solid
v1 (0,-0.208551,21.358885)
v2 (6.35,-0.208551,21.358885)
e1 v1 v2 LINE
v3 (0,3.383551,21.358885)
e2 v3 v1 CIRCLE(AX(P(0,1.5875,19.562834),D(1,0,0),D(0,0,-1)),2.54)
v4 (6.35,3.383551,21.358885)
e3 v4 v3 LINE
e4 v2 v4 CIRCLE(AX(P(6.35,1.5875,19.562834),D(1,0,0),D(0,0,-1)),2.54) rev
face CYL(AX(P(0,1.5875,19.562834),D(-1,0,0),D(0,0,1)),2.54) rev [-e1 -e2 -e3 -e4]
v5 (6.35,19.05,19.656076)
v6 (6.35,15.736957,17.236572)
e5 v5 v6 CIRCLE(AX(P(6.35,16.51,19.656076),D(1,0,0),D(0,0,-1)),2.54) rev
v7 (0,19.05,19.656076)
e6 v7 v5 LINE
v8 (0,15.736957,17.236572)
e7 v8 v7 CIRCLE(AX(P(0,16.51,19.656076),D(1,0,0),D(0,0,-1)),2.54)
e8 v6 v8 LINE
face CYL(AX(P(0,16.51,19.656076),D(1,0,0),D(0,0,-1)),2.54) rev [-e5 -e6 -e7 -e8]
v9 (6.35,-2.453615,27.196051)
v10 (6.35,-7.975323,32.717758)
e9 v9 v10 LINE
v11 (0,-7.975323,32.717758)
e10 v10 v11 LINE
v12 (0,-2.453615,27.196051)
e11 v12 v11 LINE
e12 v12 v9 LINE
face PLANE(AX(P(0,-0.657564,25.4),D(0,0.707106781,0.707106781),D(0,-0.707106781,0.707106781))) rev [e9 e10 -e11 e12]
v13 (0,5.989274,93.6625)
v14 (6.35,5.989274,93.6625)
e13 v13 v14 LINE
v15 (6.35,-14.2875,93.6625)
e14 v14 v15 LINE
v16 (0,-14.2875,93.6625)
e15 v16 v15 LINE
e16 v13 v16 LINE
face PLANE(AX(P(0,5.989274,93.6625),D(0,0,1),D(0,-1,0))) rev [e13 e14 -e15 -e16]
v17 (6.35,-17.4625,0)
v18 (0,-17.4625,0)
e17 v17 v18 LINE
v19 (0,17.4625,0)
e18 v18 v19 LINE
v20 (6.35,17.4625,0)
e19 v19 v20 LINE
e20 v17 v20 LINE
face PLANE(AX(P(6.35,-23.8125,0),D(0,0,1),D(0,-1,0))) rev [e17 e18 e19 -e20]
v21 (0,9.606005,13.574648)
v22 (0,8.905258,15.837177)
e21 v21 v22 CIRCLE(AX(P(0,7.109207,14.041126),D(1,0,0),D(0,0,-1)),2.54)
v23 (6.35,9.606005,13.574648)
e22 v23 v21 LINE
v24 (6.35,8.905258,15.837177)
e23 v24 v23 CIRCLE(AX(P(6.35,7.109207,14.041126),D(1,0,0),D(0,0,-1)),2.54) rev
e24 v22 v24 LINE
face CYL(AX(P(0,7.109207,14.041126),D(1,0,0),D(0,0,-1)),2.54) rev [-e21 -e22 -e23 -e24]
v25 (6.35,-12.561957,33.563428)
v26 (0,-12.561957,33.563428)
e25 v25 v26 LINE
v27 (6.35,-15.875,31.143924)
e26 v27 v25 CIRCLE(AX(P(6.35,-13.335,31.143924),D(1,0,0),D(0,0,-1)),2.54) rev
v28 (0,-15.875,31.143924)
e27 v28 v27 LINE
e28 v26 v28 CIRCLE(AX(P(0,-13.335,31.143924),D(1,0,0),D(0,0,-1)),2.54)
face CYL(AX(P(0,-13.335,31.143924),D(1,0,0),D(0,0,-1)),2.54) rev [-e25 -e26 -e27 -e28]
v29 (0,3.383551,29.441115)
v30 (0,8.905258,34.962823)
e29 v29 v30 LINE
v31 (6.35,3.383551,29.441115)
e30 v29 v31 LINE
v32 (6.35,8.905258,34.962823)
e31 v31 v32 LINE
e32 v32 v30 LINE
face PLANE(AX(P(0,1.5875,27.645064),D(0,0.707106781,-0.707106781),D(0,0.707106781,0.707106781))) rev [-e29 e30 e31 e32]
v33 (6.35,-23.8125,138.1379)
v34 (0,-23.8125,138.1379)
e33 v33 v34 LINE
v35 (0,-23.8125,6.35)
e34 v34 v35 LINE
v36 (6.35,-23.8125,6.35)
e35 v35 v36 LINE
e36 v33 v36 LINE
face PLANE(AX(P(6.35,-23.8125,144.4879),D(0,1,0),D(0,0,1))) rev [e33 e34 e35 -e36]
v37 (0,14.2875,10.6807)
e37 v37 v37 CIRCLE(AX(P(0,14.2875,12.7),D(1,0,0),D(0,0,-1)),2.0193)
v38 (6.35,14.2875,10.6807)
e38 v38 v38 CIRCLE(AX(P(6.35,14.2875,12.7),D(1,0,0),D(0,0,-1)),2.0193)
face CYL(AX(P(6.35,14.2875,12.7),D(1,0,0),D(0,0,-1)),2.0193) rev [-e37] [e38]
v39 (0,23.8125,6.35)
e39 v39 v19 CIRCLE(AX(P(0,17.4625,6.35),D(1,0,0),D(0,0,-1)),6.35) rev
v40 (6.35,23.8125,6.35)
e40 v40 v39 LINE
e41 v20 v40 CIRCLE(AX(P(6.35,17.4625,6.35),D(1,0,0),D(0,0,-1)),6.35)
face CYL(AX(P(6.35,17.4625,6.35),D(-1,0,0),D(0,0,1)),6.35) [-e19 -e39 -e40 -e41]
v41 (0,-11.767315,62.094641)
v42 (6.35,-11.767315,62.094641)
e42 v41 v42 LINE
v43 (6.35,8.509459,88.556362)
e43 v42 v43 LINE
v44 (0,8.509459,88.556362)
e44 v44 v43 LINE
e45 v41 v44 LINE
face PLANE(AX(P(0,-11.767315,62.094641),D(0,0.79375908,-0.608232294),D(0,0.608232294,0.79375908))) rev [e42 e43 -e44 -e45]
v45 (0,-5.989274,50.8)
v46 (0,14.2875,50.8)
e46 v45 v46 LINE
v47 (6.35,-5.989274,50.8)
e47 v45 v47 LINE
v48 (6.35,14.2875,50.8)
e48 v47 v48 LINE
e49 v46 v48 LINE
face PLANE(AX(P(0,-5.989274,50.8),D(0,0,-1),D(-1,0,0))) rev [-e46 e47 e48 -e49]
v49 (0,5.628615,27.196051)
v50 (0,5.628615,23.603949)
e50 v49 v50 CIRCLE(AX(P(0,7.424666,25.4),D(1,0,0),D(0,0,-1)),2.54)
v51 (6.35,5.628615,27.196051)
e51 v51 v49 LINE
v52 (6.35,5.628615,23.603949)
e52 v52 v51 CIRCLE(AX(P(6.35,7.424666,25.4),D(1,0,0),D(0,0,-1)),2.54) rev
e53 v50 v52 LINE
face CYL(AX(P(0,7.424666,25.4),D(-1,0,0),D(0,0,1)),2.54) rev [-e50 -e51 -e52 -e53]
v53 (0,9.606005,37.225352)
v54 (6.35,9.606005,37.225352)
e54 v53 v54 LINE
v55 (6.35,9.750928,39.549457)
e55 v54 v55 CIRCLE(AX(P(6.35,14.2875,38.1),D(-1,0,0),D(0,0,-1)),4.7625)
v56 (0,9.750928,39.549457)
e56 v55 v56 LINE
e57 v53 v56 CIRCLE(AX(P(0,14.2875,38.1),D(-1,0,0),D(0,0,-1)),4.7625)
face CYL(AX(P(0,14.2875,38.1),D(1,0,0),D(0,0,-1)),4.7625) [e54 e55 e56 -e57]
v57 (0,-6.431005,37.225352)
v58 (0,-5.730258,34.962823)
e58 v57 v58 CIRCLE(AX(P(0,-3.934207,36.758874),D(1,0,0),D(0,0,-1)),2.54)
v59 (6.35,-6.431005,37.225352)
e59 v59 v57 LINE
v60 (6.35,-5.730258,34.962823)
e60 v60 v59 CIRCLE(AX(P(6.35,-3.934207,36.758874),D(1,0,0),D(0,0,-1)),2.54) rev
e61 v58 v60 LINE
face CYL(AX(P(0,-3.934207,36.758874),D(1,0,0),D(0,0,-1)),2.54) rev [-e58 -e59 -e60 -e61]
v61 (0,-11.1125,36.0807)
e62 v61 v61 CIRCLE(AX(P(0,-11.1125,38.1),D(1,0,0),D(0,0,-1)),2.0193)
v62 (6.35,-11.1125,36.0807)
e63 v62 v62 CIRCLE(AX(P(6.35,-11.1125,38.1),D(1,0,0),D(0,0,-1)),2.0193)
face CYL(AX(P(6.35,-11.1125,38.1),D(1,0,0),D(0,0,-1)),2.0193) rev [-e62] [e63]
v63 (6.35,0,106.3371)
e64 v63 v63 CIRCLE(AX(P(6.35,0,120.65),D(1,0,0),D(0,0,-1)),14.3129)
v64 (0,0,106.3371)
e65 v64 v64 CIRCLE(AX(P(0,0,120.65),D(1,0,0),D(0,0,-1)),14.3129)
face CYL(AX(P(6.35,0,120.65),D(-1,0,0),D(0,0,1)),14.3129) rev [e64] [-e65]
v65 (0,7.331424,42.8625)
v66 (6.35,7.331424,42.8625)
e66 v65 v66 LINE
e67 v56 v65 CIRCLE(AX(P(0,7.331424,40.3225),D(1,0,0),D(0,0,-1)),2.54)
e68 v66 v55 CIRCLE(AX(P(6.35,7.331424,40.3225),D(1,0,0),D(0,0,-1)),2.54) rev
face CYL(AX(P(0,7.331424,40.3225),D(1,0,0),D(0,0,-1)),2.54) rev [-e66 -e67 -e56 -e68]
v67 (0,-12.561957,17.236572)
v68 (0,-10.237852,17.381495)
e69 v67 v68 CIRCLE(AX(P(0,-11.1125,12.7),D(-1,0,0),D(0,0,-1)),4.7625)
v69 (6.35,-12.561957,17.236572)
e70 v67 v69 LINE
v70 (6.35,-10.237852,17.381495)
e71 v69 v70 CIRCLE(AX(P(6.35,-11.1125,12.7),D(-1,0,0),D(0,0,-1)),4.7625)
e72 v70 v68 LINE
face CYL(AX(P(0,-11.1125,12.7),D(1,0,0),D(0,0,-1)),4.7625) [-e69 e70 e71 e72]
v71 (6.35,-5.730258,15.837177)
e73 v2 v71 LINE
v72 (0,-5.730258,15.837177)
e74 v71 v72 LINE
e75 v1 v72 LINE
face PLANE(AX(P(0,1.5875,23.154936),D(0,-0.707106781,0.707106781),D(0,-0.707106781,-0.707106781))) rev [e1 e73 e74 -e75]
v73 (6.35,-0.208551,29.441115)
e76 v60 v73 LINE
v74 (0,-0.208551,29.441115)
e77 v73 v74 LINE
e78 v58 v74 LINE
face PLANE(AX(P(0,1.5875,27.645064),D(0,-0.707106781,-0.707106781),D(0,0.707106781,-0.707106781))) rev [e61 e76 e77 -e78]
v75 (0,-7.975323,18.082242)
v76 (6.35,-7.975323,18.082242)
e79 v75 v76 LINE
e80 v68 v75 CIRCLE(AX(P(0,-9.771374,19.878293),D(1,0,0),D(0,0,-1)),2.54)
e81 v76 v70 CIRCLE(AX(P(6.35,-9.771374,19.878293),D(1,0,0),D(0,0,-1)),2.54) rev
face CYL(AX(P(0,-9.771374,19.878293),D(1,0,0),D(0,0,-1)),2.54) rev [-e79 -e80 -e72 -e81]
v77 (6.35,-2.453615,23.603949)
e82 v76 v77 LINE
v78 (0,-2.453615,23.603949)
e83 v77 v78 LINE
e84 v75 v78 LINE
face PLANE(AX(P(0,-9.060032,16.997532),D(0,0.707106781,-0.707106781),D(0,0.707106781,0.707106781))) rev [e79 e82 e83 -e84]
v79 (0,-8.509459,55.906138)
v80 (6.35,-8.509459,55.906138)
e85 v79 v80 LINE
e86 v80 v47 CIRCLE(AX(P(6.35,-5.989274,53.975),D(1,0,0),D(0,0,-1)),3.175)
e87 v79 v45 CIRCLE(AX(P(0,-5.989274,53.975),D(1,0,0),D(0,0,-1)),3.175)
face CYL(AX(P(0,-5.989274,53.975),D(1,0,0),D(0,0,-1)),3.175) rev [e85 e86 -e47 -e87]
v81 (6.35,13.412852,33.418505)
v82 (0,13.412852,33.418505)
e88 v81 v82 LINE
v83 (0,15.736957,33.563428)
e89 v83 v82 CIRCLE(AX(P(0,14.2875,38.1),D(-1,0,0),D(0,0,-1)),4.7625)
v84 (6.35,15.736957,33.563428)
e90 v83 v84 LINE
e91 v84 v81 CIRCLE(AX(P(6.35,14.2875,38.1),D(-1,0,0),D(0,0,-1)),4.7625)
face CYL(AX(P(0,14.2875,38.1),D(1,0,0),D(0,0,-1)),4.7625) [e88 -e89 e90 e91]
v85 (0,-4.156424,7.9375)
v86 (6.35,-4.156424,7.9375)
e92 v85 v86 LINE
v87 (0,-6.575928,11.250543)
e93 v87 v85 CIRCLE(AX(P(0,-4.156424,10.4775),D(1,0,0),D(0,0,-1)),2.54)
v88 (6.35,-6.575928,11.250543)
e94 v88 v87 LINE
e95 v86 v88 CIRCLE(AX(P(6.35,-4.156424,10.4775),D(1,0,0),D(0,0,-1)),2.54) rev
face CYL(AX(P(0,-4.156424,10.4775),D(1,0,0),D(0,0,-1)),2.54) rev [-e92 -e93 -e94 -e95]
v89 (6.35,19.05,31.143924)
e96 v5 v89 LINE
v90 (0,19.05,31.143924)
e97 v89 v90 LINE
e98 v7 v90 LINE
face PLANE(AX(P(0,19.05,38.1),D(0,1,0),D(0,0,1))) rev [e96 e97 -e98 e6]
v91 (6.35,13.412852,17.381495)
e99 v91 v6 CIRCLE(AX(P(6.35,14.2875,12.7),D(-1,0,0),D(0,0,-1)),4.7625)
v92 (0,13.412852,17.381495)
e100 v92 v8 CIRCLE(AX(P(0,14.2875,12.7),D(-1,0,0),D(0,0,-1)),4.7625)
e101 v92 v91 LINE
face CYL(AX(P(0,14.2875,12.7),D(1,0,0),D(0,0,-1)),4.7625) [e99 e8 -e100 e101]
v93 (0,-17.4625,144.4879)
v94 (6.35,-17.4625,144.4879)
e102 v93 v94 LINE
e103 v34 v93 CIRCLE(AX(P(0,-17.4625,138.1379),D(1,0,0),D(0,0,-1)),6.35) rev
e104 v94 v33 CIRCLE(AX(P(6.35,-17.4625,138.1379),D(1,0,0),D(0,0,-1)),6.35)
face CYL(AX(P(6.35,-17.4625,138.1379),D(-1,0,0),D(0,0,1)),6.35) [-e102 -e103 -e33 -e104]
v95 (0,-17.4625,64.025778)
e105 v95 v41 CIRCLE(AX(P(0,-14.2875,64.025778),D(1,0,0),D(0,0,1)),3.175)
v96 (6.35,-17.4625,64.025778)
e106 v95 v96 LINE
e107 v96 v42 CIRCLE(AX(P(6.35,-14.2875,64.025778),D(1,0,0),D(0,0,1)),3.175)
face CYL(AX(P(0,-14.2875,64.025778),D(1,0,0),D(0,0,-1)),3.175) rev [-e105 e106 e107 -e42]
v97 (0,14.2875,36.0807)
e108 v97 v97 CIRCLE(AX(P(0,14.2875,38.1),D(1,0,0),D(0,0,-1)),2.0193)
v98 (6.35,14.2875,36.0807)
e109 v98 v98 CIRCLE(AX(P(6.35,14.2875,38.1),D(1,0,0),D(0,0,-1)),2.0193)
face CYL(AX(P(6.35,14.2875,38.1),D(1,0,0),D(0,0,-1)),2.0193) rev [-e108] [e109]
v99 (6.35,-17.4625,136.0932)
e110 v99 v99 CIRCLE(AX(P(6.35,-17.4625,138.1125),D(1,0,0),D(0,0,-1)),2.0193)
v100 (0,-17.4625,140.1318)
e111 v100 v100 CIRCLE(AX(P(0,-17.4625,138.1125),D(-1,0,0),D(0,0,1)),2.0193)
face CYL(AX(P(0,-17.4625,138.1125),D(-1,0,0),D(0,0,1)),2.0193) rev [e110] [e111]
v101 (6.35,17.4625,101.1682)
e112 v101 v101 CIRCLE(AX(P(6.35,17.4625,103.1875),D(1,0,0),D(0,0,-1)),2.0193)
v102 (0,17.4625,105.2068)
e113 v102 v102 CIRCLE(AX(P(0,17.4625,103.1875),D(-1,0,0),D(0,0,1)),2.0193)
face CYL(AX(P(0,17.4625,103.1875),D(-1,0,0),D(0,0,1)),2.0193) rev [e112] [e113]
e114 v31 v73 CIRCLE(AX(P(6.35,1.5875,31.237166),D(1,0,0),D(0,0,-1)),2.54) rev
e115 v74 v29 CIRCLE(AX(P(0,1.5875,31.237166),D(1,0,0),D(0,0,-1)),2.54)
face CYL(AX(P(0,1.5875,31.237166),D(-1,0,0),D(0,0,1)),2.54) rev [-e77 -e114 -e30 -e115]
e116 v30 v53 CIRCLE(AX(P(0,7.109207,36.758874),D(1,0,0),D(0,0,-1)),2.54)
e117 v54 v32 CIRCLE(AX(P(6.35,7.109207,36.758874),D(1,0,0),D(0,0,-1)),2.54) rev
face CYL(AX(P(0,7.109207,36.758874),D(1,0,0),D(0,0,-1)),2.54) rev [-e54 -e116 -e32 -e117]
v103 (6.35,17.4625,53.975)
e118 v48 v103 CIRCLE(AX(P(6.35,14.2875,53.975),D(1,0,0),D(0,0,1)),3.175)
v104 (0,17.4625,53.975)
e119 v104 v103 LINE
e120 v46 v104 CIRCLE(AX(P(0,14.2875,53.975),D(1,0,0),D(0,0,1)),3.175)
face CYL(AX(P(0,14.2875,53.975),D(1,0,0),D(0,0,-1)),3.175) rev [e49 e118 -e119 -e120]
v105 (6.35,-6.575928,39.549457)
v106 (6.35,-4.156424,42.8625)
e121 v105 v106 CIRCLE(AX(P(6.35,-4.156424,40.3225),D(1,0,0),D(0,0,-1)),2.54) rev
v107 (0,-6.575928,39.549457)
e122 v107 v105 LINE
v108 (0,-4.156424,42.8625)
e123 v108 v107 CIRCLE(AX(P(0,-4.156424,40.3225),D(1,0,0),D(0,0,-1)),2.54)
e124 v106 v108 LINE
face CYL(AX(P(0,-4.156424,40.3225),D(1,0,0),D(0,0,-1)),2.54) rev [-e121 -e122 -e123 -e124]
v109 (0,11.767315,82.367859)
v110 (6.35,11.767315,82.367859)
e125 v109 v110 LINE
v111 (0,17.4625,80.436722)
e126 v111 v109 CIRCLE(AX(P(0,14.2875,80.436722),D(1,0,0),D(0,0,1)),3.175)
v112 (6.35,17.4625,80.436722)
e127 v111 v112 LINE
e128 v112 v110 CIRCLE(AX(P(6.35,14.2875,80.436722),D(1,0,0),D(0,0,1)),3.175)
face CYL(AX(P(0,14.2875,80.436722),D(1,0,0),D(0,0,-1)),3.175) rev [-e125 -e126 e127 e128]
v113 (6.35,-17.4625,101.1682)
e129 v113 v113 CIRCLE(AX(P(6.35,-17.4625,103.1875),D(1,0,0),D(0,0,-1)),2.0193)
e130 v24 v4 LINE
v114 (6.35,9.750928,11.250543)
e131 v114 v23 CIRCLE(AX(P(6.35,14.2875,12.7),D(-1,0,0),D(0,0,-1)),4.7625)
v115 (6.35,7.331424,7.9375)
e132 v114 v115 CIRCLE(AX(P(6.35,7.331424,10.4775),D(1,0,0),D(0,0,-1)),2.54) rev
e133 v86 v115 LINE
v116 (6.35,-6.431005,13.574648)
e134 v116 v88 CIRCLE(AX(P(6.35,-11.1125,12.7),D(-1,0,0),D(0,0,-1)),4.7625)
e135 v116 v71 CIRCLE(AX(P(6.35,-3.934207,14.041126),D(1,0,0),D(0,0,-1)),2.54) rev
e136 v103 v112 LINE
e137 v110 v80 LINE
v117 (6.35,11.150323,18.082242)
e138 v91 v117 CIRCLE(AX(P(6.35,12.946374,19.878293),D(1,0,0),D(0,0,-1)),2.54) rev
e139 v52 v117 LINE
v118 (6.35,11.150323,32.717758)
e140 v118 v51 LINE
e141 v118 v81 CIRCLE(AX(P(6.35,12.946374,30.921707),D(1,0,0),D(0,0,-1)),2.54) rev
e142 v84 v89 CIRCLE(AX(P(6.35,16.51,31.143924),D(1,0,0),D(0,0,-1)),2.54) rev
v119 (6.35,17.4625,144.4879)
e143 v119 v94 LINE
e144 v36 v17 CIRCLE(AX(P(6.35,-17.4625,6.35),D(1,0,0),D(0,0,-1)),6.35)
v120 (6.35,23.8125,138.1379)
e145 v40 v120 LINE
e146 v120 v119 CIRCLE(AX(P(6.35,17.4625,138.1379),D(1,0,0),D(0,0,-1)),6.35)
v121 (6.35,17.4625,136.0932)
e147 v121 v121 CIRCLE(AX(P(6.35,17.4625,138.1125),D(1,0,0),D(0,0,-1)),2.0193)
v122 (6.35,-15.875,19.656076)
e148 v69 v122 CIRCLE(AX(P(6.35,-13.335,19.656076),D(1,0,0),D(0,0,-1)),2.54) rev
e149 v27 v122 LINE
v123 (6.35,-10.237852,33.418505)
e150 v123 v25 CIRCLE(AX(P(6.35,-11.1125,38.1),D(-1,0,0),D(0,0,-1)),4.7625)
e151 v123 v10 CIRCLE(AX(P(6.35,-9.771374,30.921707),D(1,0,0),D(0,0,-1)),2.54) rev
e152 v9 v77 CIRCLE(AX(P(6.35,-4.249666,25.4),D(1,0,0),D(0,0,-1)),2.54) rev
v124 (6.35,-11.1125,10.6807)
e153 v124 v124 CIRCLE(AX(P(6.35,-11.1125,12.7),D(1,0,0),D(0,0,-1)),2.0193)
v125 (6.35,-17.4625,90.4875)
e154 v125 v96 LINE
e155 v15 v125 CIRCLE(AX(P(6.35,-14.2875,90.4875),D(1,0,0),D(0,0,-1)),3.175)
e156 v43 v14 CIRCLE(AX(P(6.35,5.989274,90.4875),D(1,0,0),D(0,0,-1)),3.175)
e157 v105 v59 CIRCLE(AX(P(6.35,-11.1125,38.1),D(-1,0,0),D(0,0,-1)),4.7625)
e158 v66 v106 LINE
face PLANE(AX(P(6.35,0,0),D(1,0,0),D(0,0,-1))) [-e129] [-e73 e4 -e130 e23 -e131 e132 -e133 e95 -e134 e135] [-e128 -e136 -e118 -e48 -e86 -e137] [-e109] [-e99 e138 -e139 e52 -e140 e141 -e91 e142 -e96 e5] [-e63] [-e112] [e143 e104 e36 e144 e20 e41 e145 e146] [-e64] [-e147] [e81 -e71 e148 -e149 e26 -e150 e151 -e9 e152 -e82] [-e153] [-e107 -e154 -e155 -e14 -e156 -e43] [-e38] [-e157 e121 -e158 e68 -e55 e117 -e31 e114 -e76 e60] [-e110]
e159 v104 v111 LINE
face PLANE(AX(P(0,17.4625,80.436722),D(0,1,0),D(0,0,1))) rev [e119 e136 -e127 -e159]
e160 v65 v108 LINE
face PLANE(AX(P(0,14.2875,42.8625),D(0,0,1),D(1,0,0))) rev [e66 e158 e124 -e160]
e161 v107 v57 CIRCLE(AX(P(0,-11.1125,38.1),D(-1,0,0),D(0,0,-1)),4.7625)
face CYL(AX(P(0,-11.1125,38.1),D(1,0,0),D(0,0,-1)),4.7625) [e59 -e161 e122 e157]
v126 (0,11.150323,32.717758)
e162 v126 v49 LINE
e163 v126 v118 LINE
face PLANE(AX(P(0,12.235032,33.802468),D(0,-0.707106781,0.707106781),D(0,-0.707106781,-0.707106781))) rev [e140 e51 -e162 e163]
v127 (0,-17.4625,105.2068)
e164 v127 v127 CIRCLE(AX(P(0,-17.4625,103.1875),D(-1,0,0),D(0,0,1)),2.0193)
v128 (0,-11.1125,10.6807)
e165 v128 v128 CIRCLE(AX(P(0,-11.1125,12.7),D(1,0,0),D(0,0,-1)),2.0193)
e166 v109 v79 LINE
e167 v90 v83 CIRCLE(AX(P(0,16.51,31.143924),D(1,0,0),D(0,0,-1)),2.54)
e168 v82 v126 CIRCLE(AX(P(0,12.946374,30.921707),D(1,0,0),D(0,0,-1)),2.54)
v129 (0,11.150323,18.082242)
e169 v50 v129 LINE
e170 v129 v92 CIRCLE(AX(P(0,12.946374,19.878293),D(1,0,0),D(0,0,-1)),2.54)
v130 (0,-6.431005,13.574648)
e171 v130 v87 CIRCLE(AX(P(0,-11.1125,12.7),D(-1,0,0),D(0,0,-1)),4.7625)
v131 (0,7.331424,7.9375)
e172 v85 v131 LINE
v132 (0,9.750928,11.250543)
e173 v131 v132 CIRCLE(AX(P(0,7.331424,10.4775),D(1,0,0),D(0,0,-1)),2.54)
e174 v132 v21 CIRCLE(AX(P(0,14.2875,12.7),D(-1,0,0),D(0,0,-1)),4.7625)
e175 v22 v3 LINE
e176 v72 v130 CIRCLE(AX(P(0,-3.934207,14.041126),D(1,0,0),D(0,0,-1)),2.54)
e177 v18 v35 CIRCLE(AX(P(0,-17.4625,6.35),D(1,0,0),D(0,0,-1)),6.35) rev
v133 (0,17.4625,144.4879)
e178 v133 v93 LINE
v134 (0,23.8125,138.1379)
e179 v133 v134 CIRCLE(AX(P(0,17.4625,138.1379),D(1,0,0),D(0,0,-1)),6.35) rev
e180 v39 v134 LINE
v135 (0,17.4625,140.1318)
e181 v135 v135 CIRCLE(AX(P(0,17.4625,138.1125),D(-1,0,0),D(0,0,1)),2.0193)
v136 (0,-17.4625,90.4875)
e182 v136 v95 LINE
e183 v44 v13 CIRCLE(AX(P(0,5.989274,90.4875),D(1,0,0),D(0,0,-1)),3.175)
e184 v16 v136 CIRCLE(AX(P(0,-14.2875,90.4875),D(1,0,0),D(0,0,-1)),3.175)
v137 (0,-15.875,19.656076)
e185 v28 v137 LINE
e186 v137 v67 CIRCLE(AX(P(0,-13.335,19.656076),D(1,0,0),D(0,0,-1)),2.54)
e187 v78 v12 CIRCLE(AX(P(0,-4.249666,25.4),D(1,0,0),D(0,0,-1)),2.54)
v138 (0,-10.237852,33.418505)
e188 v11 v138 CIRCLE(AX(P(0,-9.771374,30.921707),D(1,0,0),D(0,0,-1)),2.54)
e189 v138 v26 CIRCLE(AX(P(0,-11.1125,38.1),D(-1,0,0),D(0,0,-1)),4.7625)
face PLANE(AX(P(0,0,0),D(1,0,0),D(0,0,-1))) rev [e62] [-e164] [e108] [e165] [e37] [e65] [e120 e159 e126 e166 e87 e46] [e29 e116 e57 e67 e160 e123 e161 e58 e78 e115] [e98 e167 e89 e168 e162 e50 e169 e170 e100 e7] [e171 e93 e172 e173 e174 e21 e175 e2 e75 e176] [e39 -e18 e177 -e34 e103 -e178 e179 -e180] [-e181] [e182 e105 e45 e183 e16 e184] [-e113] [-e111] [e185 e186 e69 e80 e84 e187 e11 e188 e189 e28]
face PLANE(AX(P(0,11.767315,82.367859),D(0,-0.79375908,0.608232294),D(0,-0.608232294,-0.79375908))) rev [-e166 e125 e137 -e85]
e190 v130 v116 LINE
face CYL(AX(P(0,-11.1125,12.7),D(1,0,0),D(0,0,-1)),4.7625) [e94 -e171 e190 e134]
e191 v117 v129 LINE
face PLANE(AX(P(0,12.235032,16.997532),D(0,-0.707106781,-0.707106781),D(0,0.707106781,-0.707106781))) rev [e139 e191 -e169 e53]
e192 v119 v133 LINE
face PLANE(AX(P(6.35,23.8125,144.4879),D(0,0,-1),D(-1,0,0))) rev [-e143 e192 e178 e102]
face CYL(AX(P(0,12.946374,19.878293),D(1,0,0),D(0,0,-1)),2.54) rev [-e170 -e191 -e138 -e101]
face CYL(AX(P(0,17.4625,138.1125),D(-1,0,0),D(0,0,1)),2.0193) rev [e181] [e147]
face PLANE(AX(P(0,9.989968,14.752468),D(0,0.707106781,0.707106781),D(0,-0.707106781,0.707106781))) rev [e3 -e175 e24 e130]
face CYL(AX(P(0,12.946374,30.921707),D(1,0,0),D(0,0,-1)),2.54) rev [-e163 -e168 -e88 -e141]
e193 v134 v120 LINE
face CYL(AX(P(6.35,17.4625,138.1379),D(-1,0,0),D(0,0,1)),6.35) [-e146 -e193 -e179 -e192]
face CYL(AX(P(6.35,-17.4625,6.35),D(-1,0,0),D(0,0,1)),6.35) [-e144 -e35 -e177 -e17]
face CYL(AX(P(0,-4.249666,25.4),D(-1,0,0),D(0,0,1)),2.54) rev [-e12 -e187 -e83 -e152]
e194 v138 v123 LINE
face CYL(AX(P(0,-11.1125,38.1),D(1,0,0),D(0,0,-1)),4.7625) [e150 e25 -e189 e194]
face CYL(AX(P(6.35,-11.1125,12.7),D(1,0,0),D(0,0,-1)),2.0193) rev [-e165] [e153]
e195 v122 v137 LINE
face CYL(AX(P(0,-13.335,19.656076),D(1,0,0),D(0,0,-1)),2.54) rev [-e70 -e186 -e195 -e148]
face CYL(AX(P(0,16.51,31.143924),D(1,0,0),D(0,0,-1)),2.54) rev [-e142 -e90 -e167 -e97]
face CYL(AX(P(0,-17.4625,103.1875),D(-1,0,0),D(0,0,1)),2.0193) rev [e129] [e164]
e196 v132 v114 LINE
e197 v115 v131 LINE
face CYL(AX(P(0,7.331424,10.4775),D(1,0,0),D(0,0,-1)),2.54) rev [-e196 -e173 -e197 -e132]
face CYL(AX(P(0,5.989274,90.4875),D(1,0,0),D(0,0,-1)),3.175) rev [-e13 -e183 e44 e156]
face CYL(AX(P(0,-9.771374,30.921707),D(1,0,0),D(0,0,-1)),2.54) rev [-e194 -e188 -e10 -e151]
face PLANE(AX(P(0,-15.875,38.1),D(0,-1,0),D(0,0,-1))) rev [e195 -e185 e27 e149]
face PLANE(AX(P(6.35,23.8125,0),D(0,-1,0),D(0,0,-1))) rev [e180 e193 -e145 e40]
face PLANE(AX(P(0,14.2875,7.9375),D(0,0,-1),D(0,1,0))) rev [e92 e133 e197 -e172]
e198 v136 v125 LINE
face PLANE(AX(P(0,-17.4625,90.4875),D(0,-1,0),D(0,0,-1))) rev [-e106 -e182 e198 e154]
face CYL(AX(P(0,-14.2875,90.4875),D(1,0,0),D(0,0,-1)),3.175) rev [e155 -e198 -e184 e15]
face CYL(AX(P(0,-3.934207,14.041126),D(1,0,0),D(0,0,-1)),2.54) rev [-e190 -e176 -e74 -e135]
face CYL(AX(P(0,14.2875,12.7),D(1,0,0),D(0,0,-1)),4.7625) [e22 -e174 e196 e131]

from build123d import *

# Parameters (mm, degrees)
SKETCH1_W              = 144.4879
SKETCH1_H              = 47.625
SKETCH1_R              = 14.3129
BOSS_EXTRUDE1_DEPTH    = 6.35
FILLET1_R              = 6.35
F_10_32_TAPPED_HOLE1_D = 4.0386
F_10_32_TAPPED_HOLE2_D = 4.0386
CUT_EXTRUDE1_DEPTH     = 147.5745916
FILLET2_R              = 2.54


with BuildPart() as part:
    # Sketch1 → Boss-Extrude1 (new body)
    with BuildSketch(Plane(origin=(0, 0, 0), x_dir=(0, 0, -1), z_dir=(1, 0, 0))):
        with Locations((-72.24395, 0)):
            Rectangle(SKETCH1_W, SKETCH1_H)
        with Locations((-120.65, 0)):
            Circle(SKETCH1_R, mode=Mode.SUBTRACT)
    extrude(amount=BOSS_EXTRUDE1_DEPTH)

    # Fillet1
    fillet1_edges = [part.edges().sort_by_distance(p)[0] for p in [
        (3.175, -23.8125, 144.4879),
        (3.175, 23.8125, 144.4879),
        (3.175, 23.8125, 0),
        (3.175, -23.8125, 0),
    ]]
    fillet(fillet1_edges, radius=FILLET1_R)

    # #10-32 Tapped Hole1 (through all)
    with Locations(Plane.ZY):
        with Locations((103.1875, 17.4625), (138.1125, 17.4625), (138.1125, -17.4625), (103.1875, -17.4625)):
            Hole(F_10_32_TAPPED_HOLE1_D / 2)

    # #10-32 Tapped Hole2 (through all)
    with Locations(Plane(origin=(6.35, 0, 0), x_dir=(0, 0, -1), z_dir=(1, 0, 0))):
        with Locations((-12.7, 14.2875), (-38.1, 14.2875), (-38.1, -11.1125), (-12.7, -11.1125)):
            Hole(F_10_32_TAPPED_HOLE2_D / 2)

    # Sketch8 → Cut-Extrude1 (cut, through all)
    with BuildSketch(Plane(origin=(6.35, 0, 0), x_dir=(0, 0, -1), z_dir=(1, 0, 0))):
        with BuildLine():
            Line((-80.436721657, 17.4625), (-53.975, 17.4625))
            ThreePointArc((-53.975, 17.4625), (-51.72993597, 16.53256403), (-50.8, 14.2875))
            Line((-50.8, 14.2875), (-50.8, -5.989274253))
            ThreePointArc((-50.8, -5.989274253), (-52.569784121, -8.836376874), (-55.906137534, -8.509459331))
            Line((-55.906137534, -8.509459331), (-82.367859191, 11.767314922))
            ThreePointArc((-82.367859191, 11.767314922), (-83.443564904, 15.307067893), (-80.436721657, 17.4625))
        make_face()
        with BuildLine():
            Line((-93.6625, 5.989274253), (-93.6625, -14.2875))
            ThreePointArc((-93.6625, -14.2875), (-92.73256403, -16.53256403), (-90.4875, -17.4625))
            Line((-90.4875, -17.4625), (-64.025778343, -17.4625))
            ThreePointArc((-64.025778343, -17.4625), (-61.018935096, -15.307067893), (-62.094640809, -11.767314922))
            Line((-62.094640809, -11.767314922), (-88.556362466, 8.509459331))
            ThreePointArc((-88.556362466, 8.509459331), (-91.892715879, 8.836376874), (-93.6625, 5.989274253))
        make_face()
        with BuildLine():
            Line((-38.1, 19.05), (-12.7, 19.05))
            ThreePointArc((-12.7, 19.05), (-16.728416874, 16.827827486), (-16.997532015, 12.235032015))
            Line((-16.997532015, 12.235032015), (-25.4, 3.83256403))
            Line((-25.4, 3.83256403), (-33.802467985, 12.235032015))
            ThreePointArc((-33.802467985, 12.235032015), (-34.071583126, 16.827827486), (-38.1, 19.05))
        make_face()
        with BuildLine():
            Line((-7.9375, 14.2875), (-7.9375, -11.1125))
            ThreePointArc((-7.9375, -11.1125), (-10.159672514, -7.084083126), (-14.752467985, -6.814967985))
            Line((-14.752467985, -6.814967985), (-23.15493597, 1.5875))
            Line((-23.15493597, 1.5875), (-14.752467985, 9.989967985))
            ThreePointArc((-14.752467985, 9.989967985), (-10.159672514, 10.259083126), (-7.9375, 14.2875))
        make_face()
        with BuildLine():
            Line((-38.1, -15.875), (-12.7, -15.875))
            ThreePointArc((-12.7, -15.875), (-16.728416874, -13.652827486), (-16.997532015, -9.060032015))
            Line((-16.997532015, -9.060032015), (-25.4, -0.65756403))
            Line((-25.4, -0.65756403), (-33.802467985, -9.060032015))
            ThreePointArc((-33.802467985, -9.060032015), (-34.071583126, -13.652827486), (-38.1, -15.875))
        make_face()
        with BuildLine():
            Line((-42.8625, 14.2875), (-42.8625, -11.1125))
            ThreePointArc((-42.8625, -11.1125), (-40.640327486, -7.084083126), (-36.047532015, -6.814967985))
            Line((-36.047532015, -6.814967985), (-27.64506403, 1.5875))
            Line((-27.64506403, 1.5875), (-36.047532015, 9.989967985))
            ThreePointArc((-36.047532015, 9.989967985), (-40.640327486, 10.259083126), (-42.8625, 14.2875))
        make_face()
    extrude(amount=-CUT_EXTRUDE1_DEPTH, mode=Mode.SUBTRACT)

    # Fillet2
    fillet2_edges = [part.edges().sort_by_distance(p)[0] for p in [
        (3.175, -15.875, 12.7),
    ]]
    fillet(fillet2_edges, radius=FILLET2_R)
    fillet2_2_edges = [part.edges().sort_by_distance(p)[0] for p in [
        (3.175, -9.060032015, 16.997532015),
    ]]
    fillet(fillet2_2_edges, radius=FILLET2_R)
    fillet2_3_edges = [part.edges().sort_by_distance(p)[0] for p in [
        (3.175, -0.65756403, 25.4),
    ]]
    fillet(fillet2_3_edges, radius=FILLET2_R)
    fillet2_4_edges = [part.edges().sort_by_distance(p)[0] for p in [
        (3.175, -9.060032015, 33.802467985),
    ]]
    fillet(fillet2_4_edges, radius=FILLET2_R)
    fillet2_5_edges = [part.edges().sort_by_distance(p)[0] for p in [
        (3.175, 14.2875, 42.8625),
    ]]
    fillet(fillet2_5_edges, radius=FILLET2_R)
    fillet2_6_edges = [part.edges().sort_by_distance(p)[0] for p in [
        (3.175, -6.814967985, 36.047532015),
    ]]
    fillet(fillet2_6_edges, radius=FILLET2_R)
    fillet2_7_edges = [part.edges().sort_by_distance(p)[0] for p in [
        (3.175, 1.5875, 27.64506403),
    ]]
    fillet(fillet2_7_edges, radius=FILLET2_R)
    fillet2_8_edges = [part.edges().sort_by_distance(p)[0] for p in [
        (3.175, 9.989967985, 36.047532015),
    ]]
    fillet(fillet2_8_edges, radius=FILLET2_R)
    fillet2_9_edges = [part.edges().sort_by_distance(p)[0] for p in [
        (3.175, 14.2875, 7.9375),
    ]]
    fillet(fillet2_9_edges, radius=FILLET2_R)
    fillet2_10_edges = [part.edges().sort_by_distance(p)[0] for p in [
        (3.175, 9.989967985, 14.752467985),
    ]]
    fillet(fillet2_10_edges, radius=FILLET2_R)
    fillet2_11_edges = [part.edges().sort_by_distance(p)[0] for p in [
        (3.175, 1.5875, 23.15493597),
    ]]
    fillet(fillet2_11_edges, radius=FILLET2_R)
    fillet2_12_edges = [part.edges().sort_by_distance(p)[0] for p in [
        (3.175, -6.814967985, 14.752467985),
    ]]
    fillet(fillet2_12_edges, radius=FILLET2_R)
    fillet2_13_edges = [part.edges().sort_by_distance(p)[0] for p in [
        (3.175, -11.1125, 7.9375),
    ]]
    fillet(fillet2_13_edges, radius=FILLET2_R)
    fillet2_14_edges = [part.edges().sort_by_distance(p)[0] for p in [
        (3.175, 19.05, 38.1),
    ]]
    fillet(fillet2_14_edges, radius=FILLET2_R)
    fillet2_15_edges = [part.edges().sort_by_distance(p)[0] for p in [
        (3.175, 12.235032015, 33.802467985),
    ]]
    fillet(fillet2_15_edges, radius=FILLET2_R)
    fillet2_16_edges = [part.edges().sort_by_distance(p)[0] for p in [
        (3.175, 3.83256403, 25.4),
    ]]
    fillet(fillet2_16_edges, radius=FILLET2_R)
    fillet2_17_edges = [part.edges().sort_by_distance(p)[0] for p in [
        (3.175, 12.235032015, 16.997532015),
    ]]
    fillet(fillet2_17_edges, radius=FILLET2_R)
    fillet2_18_edges = [part.edges().sort_by_distance(p)[0] for p in [
        (3.175, 19.05, 12.7),
    ]]
    fillet(fillet2_18_edges, radius=FILLET2_R)
    fillet2_19_edges = [part.edges().sort_by_distance(p)[0] for p in [
        (3.175, -15.875, 38.1),
    ]]
    fillet(fillet2_19_edges, radius=FILLET2_R)
    fillet2_20_edges = [part.edges().sort_by_distance(p)[0] for p in [
        (3.175, -11.1125, 42.8625),
    ]]
    fillet(fillet2_20_edges, radius=FILLET2_R)


solid = part.part
